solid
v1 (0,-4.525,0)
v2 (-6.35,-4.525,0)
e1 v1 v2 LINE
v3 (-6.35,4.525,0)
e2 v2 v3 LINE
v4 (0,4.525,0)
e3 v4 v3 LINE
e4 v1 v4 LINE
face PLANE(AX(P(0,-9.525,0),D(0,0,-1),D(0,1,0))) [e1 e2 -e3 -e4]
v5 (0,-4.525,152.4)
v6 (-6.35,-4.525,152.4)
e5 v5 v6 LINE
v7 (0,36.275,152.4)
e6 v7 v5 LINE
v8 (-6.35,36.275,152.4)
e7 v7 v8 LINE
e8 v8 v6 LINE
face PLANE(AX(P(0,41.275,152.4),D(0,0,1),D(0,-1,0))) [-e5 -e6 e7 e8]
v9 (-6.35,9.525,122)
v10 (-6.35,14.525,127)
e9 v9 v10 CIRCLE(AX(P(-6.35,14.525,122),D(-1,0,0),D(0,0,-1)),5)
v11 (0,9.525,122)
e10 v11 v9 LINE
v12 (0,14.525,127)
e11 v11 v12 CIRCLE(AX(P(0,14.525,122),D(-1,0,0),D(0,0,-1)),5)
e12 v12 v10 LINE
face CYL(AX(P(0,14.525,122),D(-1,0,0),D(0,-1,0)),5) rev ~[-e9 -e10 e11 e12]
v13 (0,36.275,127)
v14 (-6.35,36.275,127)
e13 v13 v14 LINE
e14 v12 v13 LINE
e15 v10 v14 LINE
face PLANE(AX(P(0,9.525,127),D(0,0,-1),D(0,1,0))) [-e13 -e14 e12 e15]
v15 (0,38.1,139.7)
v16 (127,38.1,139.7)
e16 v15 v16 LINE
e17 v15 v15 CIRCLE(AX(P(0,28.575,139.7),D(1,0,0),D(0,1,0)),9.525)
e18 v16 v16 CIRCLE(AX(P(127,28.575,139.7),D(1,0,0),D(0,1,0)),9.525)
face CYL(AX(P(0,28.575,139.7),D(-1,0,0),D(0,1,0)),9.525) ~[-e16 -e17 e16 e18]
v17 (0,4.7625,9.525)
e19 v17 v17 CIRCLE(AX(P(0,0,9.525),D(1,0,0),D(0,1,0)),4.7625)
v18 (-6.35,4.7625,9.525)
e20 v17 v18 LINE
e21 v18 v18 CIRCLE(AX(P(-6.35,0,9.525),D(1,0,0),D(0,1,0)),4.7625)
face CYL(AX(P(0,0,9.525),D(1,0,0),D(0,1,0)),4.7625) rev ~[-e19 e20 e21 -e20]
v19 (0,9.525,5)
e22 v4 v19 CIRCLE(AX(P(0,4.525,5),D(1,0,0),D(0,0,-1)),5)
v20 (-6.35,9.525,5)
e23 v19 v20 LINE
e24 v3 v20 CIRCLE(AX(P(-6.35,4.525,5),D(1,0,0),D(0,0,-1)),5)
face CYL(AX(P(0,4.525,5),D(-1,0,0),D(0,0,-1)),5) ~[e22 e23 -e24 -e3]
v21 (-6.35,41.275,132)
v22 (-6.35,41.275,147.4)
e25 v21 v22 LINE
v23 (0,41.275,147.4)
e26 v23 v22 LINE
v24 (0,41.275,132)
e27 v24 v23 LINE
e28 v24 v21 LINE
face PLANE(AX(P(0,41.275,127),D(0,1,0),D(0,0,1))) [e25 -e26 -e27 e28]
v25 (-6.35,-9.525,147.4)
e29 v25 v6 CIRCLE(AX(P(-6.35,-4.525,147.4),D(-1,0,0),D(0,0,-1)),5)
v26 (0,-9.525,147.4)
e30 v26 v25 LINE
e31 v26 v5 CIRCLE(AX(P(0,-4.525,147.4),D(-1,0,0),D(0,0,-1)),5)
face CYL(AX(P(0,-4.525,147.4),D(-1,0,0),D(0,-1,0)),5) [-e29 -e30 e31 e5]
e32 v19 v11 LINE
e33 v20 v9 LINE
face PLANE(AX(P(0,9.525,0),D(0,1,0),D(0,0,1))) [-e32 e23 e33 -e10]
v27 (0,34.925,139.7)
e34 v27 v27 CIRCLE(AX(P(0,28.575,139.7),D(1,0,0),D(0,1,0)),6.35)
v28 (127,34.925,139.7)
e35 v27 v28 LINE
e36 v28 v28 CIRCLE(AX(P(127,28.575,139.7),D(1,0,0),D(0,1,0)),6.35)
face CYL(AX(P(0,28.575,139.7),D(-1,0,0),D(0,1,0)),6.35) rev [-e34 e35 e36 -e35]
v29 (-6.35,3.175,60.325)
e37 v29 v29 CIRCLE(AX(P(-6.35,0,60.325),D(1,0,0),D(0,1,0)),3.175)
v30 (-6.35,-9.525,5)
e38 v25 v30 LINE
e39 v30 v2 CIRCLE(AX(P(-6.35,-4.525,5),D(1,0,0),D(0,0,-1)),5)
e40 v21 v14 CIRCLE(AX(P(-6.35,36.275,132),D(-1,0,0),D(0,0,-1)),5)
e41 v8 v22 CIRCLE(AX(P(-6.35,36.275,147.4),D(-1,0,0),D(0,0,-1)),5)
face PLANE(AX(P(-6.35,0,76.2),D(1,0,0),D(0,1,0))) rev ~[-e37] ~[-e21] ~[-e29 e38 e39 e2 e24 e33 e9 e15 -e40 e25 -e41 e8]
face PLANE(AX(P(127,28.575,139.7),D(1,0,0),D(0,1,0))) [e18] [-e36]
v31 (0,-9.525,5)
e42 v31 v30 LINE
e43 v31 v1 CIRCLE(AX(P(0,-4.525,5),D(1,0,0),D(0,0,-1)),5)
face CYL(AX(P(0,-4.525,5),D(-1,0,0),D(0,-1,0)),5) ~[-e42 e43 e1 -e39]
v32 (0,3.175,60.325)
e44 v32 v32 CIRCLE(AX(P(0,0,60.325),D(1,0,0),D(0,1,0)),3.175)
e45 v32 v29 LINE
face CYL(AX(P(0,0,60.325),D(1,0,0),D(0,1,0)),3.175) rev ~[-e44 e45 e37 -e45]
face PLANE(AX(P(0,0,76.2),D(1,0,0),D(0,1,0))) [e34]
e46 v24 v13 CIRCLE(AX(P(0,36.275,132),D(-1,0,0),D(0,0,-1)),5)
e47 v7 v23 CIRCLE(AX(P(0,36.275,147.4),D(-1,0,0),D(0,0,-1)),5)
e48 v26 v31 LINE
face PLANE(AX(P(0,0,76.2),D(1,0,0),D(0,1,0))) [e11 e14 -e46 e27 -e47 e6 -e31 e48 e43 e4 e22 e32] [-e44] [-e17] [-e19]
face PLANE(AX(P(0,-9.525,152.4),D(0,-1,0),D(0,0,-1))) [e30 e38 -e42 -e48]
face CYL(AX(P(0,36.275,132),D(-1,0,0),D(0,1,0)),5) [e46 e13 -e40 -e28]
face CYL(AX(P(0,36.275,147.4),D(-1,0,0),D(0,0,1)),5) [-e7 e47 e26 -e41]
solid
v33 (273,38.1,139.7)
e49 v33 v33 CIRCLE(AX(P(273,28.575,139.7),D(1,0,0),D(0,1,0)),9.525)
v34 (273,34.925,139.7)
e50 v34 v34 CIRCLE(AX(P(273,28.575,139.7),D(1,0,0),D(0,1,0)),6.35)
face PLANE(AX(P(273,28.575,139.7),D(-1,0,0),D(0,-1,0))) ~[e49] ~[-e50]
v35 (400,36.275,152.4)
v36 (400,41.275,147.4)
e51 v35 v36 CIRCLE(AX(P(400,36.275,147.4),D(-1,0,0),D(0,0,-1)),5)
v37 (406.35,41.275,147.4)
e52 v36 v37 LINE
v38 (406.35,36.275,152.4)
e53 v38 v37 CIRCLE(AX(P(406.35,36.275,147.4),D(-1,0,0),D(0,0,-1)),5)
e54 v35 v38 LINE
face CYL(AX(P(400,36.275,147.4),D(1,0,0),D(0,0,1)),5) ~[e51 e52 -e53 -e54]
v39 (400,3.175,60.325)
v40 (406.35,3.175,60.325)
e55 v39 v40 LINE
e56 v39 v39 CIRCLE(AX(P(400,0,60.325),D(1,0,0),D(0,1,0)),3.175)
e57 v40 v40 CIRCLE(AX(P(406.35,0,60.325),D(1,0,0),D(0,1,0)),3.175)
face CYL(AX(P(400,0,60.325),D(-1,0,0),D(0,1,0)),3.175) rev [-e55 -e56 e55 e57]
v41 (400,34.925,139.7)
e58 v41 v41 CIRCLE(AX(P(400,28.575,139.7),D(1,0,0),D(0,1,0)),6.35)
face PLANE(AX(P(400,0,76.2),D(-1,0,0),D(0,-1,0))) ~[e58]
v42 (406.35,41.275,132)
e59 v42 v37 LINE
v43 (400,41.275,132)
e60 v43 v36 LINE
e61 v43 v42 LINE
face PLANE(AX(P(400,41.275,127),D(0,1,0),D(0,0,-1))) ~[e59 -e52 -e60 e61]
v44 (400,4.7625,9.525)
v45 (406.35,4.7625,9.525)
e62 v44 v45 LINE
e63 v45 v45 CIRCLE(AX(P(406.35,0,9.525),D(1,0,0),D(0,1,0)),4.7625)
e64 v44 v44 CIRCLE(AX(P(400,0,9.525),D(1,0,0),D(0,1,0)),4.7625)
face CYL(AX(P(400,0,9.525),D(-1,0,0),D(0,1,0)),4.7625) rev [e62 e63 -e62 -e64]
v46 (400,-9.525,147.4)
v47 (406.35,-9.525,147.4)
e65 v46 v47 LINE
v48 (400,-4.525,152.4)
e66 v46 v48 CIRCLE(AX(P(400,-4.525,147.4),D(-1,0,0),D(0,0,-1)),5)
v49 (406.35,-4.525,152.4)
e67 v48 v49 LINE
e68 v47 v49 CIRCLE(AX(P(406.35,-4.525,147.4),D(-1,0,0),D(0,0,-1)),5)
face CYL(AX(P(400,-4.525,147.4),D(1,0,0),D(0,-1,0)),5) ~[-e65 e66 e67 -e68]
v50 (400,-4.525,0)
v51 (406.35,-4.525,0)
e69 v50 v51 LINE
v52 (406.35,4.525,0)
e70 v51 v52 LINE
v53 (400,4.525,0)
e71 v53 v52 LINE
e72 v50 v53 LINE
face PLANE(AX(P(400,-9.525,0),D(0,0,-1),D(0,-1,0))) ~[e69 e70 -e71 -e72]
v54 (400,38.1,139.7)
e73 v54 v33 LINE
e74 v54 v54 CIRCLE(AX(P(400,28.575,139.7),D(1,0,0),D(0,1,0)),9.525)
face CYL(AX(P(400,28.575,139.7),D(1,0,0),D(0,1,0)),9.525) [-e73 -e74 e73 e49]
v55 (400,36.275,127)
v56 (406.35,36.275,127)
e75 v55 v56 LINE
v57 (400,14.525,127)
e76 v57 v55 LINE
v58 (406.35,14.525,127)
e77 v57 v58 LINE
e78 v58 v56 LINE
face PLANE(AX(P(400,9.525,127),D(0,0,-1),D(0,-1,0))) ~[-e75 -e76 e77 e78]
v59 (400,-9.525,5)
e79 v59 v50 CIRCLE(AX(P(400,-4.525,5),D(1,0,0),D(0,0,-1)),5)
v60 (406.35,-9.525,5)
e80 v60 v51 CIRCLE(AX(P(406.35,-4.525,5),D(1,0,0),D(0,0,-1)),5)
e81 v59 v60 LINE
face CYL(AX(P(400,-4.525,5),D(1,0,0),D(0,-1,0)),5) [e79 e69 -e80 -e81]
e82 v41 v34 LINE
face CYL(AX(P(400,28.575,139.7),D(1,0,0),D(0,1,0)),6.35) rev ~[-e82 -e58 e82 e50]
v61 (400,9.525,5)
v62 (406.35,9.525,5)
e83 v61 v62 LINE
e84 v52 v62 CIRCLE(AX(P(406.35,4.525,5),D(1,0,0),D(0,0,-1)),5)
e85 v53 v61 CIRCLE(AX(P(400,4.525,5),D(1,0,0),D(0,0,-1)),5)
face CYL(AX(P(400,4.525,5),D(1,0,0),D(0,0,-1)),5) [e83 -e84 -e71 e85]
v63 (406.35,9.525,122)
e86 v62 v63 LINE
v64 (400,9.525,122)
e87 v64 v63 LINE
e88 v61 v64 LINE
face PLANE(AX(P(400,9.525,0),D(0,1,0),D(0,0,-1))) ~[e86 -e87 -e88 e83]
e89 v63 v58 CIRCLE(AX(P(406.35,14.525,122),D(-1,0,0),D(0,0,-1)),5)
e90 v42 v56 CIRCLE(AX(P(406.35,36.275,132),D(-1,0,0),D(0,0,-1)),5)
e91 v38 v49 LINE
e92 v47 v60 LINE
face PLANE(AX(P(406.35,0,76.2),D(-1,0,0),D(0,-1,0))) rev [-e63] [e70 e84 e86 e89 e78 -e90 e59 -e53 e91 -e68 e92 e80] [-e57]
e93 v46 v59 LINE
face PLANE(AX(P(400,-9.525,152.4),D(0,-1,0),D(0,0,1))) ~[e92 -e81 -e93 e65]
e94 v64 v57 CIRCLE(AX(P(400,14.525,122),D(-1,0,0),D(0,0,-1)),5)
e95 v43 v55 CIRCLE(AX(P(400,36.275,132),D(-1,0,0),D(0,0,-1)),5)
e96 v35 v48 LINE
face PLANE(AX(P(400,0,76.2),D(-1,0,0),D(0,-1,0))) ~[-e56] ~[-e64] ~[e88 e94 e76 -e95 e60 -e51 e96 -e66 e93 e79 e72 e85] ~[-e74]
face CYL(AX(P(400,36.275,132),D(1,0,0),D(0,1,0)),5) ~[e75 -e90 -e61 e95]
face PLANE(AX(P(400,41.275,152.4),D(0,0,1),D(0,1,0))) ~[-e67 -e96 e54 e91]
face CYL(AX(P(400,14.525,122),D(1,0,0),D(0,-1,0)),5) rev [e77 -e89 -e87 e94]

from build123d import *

# Parameters (mm, degrees)
F0_W     = 31.75
F0_H     = 25.4
F1_DEPTH = 6.35
F2_R     = 9.525
F2_R_2   = 6.35
F3_DEPTH = 127
F4_R     = 5
F5_R     = 4.7625
F5_R_2   = 3.175
F6_DEPTH = 6.351


# Not quite as in the source:
# - a length typed as a fraction of an inch, garbled in the dataset ("3 / 203.2 mm" for 3/8 in), is restored


with BuildPart() as f1:
    # F0 (on Right) → F1 (new body)
    with BuildSketch(Plane.YZ):
        Polygon((-9.525, 152.4), (-9.525, 0), (9.525, 0), (9.525, 127), (9.525, 152.4), align=None)
        with Locations((25.4, 139.7)):
            Rectangle(F0_W, F0_H)
    extrude(amount=-F1_DEPTH)

    # F2 (on face) → F3 (join)
    with BuildSketch(Plane.YZ):
        with Locations((28.575, 139.7)):
            Circle(F2_R)
        with Locations((28.575, 139.7)):
            Circle(F2_R_2, mode=Mode.SUBTRACT)
    extrude(amount=F3_DEPTH)

    # F4
    f4_edges = [f1.edges().sort_by_distance(p)[0] for p in [
        (-3.175, -9.525, 152.4),
        (-3.175, 9.525, 127),
        (-3.175, 41.275, 127),
        (-3.175, 41.275, 152.4),
        (-3.175, 9.525, 0),
        (-3.175, -9.525, 0),
    ]]
    fillet(f4_edges, radius=F4_R)

    # F5 (on face) → F6 (cut, through all)
    with BuildSketch(Plane.YZ):
        with Locations((0, 9.525)):
            Circle(F5_R)
        with Locations((0, 60.325)):
            Circle(F5_R_2)
    extrude(amount=-F6_DEPTH, mode=Mode.SUBTRACT)


with BuildPart() as f8_1:
    # F8: instance of F1
    add(f1.part.mirror(Plane.YZ.offset(200)))


solid = Compound([f1.part, f8_1.part])
